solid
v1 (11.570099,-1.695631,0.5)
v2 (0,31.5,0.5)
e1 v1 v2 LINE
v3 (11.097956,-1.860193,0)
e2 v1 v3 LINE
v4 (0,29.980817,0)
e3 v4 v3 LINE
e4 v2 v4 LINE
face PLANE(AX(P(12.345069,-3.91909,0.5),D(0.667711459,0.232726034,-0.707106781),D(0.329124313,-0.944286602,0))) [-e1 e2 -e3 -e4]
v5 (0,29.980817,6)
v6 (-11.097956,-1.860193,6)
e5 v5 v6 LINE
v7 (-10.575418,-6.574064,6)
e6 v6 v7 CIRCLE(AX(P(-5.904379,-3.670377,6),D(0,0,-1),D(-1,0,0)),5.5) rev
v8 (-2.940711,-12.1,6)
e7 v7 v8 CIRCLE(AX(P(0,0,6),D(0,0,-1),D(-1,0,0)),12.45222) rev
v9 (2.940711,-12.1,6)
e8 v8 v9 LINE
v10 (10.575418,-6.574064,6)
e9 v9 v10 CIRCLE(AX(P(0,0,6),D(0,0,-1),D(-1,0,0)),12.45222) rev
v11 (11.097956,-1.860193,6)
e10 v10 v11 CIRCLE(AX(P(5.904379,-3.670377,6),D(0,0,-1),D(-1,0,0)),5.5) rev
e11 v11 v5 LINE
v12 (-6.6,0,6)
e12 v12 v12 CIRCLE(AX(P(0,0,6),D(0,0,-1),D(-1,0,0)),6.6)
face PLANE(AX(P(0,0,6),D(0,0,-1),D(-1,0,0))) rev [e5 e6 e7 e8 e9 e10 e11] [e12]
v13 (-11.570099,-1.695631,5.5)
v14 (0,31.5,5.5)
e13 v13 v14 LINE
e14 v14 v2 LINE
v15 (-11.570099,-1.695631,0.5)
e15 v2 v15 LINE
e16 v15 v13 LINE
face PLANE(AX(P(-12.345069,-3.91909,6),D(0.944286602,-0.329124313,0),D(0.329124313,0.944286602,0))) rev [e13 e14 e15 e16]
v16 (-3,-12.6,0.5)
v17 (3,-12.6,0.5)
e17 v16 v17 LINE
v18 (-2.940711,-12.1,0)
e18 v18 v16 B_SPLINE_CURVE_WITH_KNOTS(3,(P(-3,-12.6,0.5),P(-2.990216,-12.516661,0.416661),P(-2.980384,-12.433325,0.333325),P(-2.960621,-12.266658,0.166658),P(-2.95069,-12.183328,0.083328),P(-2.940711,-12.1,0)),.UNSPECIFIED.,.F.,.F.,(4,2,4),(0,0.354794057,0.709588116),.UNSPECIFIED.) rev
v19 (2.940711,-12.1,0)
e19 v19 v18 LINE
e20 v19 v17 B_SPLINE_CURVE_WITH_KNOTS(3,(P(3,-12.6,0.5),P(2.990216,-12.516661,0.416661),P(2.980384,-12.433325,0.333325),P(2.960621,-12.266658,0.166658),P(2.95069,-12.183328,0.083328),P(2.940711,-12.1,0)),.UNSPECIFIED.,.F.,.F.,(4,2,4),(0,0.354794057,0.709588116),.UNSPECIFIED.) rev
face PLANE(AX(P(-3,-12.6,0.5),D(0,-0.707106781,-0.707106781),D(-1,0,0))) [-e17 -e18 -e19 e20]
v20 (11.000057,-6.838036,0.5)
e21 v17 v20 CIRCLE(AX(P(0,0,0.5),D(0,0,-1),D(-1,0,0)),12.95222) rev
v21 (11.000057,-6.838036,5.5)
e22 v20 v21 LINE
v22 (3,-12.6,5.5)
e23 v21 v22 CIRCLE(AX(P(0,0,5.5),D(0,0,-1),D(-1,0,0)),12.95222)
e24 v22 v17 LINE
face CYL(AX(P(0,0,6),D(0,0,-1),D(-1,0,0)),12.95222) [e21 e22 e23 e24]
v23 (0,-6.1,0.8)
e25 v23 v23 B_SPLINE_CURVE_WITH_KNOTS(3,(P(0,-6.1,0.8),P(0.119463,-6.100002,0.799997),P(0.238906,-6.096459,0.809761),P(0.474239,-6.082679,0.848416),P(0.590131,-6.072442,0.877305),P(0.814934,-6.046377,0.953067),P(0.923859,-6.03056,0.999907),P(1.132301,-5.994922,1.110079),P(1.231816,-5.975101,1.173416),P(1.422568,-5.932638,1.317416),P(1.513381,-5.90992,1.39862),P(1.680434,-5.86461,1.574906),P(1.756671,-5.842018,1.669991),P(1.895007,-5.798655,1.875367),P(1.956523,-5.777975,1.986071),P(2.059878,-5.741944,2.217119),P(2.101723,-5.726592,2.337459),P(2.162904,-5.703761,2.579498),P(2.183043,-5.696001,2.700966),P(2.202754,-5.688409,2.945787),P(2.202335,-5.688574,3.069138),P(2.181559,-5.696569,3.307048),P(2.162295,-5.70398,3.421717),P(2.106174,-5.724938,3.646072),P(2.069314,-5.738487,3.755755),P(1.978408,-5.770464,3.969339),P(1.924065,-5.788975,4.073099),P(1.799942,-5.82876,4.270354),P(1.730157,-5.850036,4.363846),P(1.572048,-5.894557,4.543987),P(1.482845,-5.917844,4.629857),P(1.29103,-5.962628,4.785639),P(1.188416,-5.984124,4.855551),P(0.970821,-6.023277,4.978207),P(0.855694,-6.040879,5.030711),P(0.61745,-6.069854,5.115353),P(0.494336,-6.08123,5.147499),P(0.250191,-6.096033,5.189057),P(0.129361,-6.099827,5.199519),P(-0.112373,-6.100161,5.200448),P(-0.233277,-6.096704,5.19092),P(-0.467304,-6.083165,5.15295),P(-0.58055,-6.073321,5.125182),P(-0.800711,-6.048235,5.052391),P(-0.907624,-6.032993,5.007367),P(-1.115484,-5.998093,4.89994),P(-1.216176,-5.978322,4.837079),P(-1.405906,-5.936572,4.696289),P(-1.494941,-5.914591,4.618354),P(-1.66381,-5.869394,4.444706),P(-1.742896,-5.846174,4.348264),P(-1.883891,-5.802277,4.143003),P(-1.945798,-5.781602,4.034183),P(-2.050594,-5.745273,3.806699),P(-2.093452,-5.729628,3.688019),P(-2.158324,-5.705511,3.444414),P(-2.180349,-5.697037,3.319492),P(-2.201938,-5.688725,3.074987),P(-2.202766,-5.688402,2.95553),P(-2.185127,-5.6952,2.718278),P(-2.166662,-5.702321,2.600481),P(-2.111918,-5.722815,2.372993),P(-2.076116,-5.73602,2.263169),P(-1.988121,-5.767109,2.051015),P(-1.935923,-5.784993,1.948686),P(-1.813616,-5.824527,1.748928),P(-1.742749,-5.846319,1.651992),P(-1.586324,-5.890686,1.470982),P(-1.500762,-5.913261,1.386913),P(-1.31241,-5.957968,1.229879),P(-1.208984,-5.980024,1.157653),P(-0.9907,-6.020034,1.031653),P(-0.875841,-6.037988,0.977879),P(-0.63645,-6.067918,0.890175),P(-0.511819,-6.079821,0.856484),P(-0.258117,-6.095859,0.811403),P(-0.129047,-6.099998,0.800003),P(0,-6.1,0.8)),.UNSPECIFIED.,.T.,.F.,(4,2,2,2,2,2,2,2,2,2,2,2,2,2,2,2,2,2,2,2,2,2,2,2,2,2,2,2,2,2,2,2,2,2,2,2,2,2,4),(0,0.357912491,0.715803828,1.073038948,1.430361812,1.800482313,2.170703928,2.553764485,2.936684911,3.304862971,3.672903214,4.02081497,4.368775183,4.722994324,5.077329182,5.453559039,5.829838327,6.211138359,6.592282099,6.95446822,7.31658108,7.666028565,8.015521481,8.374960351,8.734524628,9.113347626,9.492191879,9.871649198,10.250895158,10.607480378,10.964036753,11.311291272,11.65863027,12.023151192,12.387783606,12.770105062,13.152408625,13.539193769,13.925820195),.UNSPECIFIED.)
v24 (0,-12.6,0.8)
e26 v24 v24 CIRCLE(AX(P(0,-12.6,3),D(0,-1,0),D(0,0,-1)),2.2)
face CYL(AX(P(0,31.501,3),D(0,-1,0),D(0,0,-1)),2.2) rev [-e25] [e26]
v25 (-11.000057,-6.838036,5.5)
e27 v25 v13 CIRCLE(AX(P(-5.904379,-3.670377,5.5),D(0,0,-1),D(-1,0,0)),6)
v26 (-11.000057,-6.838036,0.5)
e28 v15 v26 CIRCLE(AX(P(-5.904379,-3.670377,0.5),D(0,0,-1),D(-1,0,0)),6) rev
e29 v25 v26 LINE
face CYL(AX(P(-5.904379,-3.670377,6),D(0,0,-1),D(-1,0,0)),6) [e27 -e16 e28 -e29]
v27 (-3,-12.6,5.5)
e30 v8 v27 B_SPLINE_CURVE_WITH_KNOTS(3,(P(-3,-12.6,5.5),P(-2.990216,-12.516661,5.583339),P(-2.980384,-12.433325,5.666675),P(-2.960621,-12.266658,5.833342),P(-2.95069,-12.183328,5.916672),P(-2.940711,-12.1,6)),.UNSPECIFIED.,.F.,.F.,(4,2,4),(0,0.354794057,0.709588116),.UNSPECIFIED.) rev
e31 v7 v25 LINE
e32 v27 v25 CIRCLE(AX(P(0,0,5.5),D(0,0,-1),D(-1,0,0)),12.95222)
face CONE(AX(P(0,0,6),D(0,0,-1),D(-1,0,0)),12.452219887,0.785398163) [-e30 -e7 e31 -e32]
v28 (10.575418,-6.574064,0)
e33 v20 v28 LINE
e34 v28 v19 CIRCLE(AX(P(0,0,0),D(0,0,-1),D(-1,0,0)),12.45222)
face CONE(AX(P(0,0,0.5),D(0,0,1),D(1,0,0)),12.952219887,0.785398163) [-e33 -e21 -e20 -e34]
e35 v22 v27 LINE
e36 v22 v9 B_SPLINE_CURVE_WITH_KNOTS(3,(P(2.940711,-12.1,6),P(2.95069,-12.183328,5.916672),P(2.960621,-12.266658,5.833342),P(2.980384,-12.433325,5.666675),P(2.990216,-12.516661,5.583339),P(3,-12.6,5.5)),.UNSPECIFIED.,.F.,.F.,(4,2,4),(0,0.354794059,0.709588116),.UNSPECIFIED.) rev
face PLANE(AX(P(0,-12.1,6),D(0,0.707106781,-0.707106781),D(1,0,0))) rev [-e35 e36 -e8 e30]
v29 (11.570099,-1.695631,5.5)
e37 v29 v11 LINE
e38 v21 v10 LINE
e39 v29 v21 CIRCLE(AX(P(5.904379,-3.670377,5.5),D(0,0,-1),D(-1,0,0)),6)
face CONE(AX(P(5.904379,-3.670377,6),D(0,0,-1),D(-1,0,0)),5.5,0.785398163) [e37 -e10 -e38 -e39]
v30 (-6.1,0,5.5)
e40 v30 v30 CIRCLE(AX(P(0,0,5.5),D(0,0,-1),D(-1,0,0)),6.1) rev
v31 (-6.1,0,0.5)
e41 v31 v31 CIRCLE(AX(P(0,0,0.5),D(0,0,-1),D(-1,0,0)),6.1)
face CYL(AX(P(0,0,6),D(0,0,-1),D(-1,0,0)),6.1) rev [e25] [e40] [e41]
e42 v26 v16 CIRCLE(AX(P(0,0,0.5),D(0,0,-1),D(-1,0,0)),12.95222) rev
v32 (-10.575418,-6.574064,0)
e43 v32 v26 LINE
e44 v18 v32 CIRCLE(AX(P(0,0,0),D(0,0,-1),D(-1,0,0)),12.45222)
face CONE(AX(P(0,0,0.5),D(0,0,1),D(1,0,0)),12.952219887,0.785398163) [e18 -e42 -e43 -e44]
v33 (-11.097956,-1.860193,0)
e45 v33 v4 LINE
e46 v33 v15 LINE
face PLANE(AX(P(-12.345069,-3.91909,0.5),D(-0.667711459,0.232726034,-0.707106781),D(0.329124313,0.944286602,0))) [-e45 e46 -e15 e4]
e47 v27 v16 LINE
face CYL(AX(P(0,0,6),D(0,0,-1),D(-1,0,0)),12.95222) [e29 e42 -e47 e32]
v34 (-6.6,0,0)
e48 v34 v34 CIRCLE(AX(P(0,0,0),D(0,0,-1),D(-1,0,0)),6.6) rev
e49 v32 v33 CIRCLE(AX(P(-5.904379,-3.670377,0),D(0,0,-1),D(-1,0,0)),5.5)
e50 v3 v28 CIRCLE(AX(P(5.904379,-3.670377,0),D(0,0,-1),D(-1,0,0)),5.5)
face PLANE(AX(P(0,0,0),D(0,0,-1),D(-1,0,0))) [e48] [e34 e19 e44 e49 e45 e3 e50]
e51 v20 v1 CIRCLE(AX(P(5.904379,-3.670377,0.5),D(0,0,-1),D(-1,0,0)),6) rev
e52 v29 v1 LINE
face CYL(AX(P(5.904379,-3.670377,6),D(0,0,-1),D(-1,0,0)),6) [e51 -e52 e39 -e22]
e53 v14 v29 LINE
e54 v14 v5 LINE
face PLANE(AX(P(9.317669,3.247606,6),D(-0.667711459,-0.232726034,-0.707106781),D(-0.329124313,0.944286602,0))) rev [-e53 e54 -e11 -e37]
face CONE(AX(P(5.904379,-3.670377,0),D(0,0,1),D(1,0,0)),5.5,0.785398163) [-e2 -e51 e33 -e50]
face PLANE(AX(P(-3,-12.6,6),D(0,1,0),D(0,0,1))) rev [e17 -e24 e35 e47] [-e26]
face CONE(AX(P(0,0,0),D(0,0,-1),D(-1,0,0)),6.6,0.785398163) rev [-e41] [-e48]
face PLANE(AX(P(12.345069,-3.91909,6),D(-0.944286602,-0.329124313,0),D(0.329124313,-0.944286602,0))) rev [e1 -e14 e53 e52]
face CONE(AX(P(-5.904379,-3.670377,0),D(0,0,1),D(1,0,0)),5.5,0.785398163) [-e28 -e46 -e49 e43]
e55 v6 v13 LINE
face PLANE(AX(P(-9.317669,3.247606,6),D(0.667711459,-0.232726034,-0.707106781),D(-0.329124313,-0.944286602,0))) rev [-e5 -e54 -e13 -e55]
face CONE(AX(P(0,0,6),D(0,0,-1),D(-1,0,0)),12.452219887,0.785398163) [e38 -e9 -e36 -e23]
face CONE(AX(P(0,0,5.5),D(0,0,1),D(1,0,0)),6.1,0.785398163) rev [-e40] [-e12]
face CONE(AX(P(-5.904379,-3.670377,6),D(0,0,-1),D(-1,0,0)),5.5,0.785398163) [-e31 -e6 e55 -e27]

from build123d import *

# Parameters (mm, degrees)
SKIZZE1_R                            = 6.1
AUFSATZ_LINEAR_AUSTRAGEN1_DEPTH      = 6
SCHNITT_LINEAR_AUSTRAGEN1_REACH      = 48.187
SCHNITT_LINEAR_AUSTRAGEN1_END_RADIUS = 6.1
SKIZZE2_R                            = 2.2
VERRUNDUNG1_R                        = 6
FASE1_SIZE                           = 0.5


with BuildPart() as part:
    # Skizze1 → Aufsatz-Linear austragen1 (new body)
    with BuildSketch(Plane.XY):
        with BuildLine():
            Line((-3, -12.6), (3, -12.6))
            ThreePointArc((3, -12.6), (8.815176648, -9.489608035), (12.34506932, -3.919089625))
            Line((12.34506932, -3.919089625), (0, 31.5))
            Line((0, 31.5), (-12.34506932, -3.919089625))
            ThreePointArc((-12.34506932, -3.919089625), (-8.815176648, -9.489608035), (-3, -12.6))
        make_face()
        Circle(SKIZZE1_R, mode=Mode.SUBTRACT)
    extrude(amount=AUFSATZ_LINEAR_AUSTRAGEN1_DEPTH)

    # Schnitt-Linear austragen1: up to this cylinder (the profile starts outside it)
    schnitt_linear_austragen1_end = Plane(origin=(0, 0, 3), z_dir=(0, 0, -1)) * Cylinder(SCHNITT_LINEAR_AUSTRAGEN1_END_RADIUS, 109.574, mode=Mode.PRIVATE)
    # Skizze2 → Schnitt-Linear austragen1 (cut, up to the surface)
    with BuildSketch(Plane.XZ.offset(12.6), mode=Mode.PRIVATE) as schnitt_linear_austragen1_sk1:
        with Locations(Location((0, 3, 0), (0, 0, 270))):
            Circle(SKIZZE2_R)
    schnitt_linear_austragen1_tool1 = extrude(schnitt_linear_austragen1_sk1.sketch, amount=-SCHNITT_LINEAR_AUSTRAGEN1_REACH, mode=Mode.PRIVATE) - schnitt_linear_austragen1_end
    add(schnitt_linear_austragen1_tool1.solids().sort_by_distance((0, -12.6, 3))[0], mode=Mode.SUBTRACT)

    # Verrundung1
    verrundung1_edges = [part.edges().sort_by_distance(p)[0] for p in [
        (-12.34506932, -3.919089625, 3),
        (12.34506932, -3.919089625, 3),
    ]]
    fillet(verrundung1_edges, radius=VERRUNDUNG1_R)

    # Fase1
    # the kernel refuses this chamfer: 0.5 mm, written as the material it takes off along each edge
    with BuildSketch(Plane(origin=(0, 0, 6), x_dir=(0.1340527924962947, -0.9909741918051879, 0), z_dir=(-0.9909741918051879, -0.1340527924962947, 0))) as fase1_piece_1:
        Polygon((12.952219887 - FASE1_SIZE, 0), (12.952219887, -FASE1_SIZE), (12.952219887, 0), align=None)
    revolve(axis=Axis((0, 0, 6), (0, 0, 1)), revolution_arc=50.429560745, mode=Mode.SUBTRACT)
    with BuildSketch(Plane(origin=(0, 0, 0), x_dir=(1, 0, 0), z_dir=(0, -1, 0))) as fase1_piece_2:
        Polygon((6.1 + FASE1_SIZE, 0), (6.1, FASE1_SIZE), (6.1, 0), align=None)
    revolve(axis=Axis((0, 0, 0), (0, 0, 1)), mode=Mode.SUBTRACT)
    with BuildSketch(Plane(origin=(0, 0, 6), x_dir=(1, 0, 0), z_dir=(0, -1, 0))) as fase1_piece_3:
        Polygon((6.1 + FASE1_SIZE, 0), (6.1, -FASE1_SIZE), (6.1, 0), align=None)
    revolve(axis=Axis((0, 0, 6), (0, 0, 1)), mode=Mode.SUBTRACT)
    with BuildSketch(Plane(origin=(0.423201699, 32.714202895, 6), x_dir=(0.9439295829747817, -0.32899987713443074, 0.0274958766105856), z_dir=(-0.32912431347143534, -0.9442866017697998, 0)), Plane(origin=(11.570098829, -1.695631129, 6), x_dir=(-0.9439295829747814, -0.32899987713443096, 0.027495876610585616), z_dir=(-0.32912431347143556, 0.9442866017697997, 0))) as fase1_piece_4:
        Polygon((FASE1_SIZE * 0.999621916911, -FASE1_SIZE * 0.0274958766106), (-FASE1_SIZE * 0.0274958766106, -FASE1_SIZE * 0.999621916911), (0, 0), align=None)
    extrude(amount=36.440032041, mode=Mode.SUBTRACT)
    with BuildSketch(Plane(origin=(11.570098829, -1.695631129, 0), x_dir=(-0.9439295829747814, -0.32899987713443096, -0.02749587661058635), z_dir=(-0.32912431347143556, 0.9442866017697997, 0)), Plane(origin=(0.423201699, 32.714202895, 0), x_dir=(0.9439295829747817, -0.32899987713443074, -0.027495876610586334), z_dir=(-0.32912431347143534, -0.9442866017697998, 0))) as fase1_piece_5:
        Polygon((FASE1_SIZE * 0.999621916911, FASE1_SIZE * 0.0274958766106), (-FASE1_SIZE * 0.0274958766106, FASE1_SIZE * 0.999621916911), (0, 0), align=None)
    extrude(amount=36.440032041, mode=Mode.SUBTRACT)
    with BuildSketch(Plane(origin=(0, 0, 0), x_dir=(-0.8492796998321288, -0.5279431706661704, 0), z_dir=(-0.5279431706661704, 0.8492796998321288, 0))) as fase1_piece_6:
        Polygon((12.952219887, FASE1_SIZE), (12.952219887 - FASE1_SIZE, 0), (12.952219887, 0), align=None)
    revolve(axis=Axis((0, 0, 0), (0, 0, 1)), revolution_arc=50.429560745, mode=Mode.SUBTRACT)
    with BuildSketch(Plane(origin=(-5.904379219, -3.67037701, 0), x_dir=(-0.849279699832129, -0.5279431706661702, 0), z_dir=(0.5279431706661702, -0.849279699832129, 0))) as fase1_piece_7:
        Polygon((6 - FASE1_SIZE, 0), (6, -FASE1_SIZE), (6, 0), align=None)
    revolve(axis=Axis((-5.904379219, -3.67037701, 0), (0, 0, -1)), revolution_arc=51.08222172, mode=Mode.SUBTRACT)
    with BuildSketch(Plane(origin=(5.904379219, -3.67037701, 0), x_dir=(0.8492796998321291, -0.5279431706661698, 0), z_dir=(-0.5279431706661698, -0.8492796998321291, 0))) as fase1_piece_8:
        Polygon((6 - FASE1_SIZE, 0), (6, FASE1_SIZE), (6, 0), align=None)
    revolve(axis=Axis((5.904379219, -3.67037701, 0), (0, 0, 1)), revolution_arc=51.08222172, mode=Mode.SUBTRACT)
    with BuildSketch(Plane(origin=(0, 0, 6), x_dir=(-0.8492796998321288, -0.5279431706661704, 0), z_dir=(-0.5279431706661704, 0.8492796998321288, 0))) as fase1_piece_9:
        Polygon((12.952219887, -FASE1_SIZE), (12.952219887 - FASE1_SIZE, 0), (12.952219887, 0), align=None)
    revolve(axis=Axis((0, 0, 6), (0, 0, 1)), revolution_arc=50.429560745, mode=Mode.SUBTRACT)
    with BuildSketch(Plane(origin=(-5.904379219, -3.67037701, 6), x_dir=(-0.849279699832129, -0.5279431706661702, 0), z_dir=(0.5279431706661702, -0.849279699832129, 0))) as fase1_piece_10:
        Polygon((6, FASE1_SIZE), (6 - FASE1_SIZE, 0), (6, 0), align=None)
    revolve(axis=Axis((-5.904379219, -3.67037701, 6), (0, 0, -1)), revolution_arc=51.08222172, mode=Mode.SUBTRACT)
    with BuildSketch(Plane(origin=(5.904379219, -3.67037701, 6), x_dir=(0.8492796998321291, -0.5279431706661698, 0), z_dir=(-0.5279431706661698, -0.8492796998321291, 0))) as fase1_piece_11:
        Polygon((6 - FASE1_SIZE, 0), (6, -FASE1_SIZE), (6, 0), align=None)
    revolve(axis=Axis((5.904379219, -3.67037701, 6), (0, 0, 1)), revolution_arc=51.08222172, mode=Mode.SUBTRACT)
    with BuildSketch(Plane(origin=(0, 0, 0), x_dir=(0.13405279249629465, -0.9909741918051879, 0), z_dir=(-0.9909741918051879, -0.13405279249629465, 0))) as fase1_piece_12:
        Polygon((12.952219887 - FASE1_SIZE, 0), (12.952219887, FASE1_SIZE), (12.952219887, 0), align=None)
    revolve(axis=Axis((0, 0, 0), (0, 0, 1)), revolution_arc=50.429560745, mode=Mode.SUBTRACT)
    with BuildSketch(Plane(origin=(-4.285841494, -12.6, 0), x_dir=(0, 0.9996219169112968, -0.02749587661058644), z_dir=(1, 0, 0)), Plane(origin=(-4.285841494, -12.6, 6), x_dir=(0, -0.027495876610585647, -0.9996219169112968), z_dir=(1, 0, 0))) as fase1_piece_13:
        Polygon((FASE1_SIZE * 0.999621916911, FASE1_SIZE * 0.0274958766106), (-FASE1_SIZE * 0.0274958766106, FASE1_SIZE * 0.999621916911), (0, 0), align=None)
    extrude(amount=8.571682988, mode=Mode.SUBTRACT)


solid = part.part
